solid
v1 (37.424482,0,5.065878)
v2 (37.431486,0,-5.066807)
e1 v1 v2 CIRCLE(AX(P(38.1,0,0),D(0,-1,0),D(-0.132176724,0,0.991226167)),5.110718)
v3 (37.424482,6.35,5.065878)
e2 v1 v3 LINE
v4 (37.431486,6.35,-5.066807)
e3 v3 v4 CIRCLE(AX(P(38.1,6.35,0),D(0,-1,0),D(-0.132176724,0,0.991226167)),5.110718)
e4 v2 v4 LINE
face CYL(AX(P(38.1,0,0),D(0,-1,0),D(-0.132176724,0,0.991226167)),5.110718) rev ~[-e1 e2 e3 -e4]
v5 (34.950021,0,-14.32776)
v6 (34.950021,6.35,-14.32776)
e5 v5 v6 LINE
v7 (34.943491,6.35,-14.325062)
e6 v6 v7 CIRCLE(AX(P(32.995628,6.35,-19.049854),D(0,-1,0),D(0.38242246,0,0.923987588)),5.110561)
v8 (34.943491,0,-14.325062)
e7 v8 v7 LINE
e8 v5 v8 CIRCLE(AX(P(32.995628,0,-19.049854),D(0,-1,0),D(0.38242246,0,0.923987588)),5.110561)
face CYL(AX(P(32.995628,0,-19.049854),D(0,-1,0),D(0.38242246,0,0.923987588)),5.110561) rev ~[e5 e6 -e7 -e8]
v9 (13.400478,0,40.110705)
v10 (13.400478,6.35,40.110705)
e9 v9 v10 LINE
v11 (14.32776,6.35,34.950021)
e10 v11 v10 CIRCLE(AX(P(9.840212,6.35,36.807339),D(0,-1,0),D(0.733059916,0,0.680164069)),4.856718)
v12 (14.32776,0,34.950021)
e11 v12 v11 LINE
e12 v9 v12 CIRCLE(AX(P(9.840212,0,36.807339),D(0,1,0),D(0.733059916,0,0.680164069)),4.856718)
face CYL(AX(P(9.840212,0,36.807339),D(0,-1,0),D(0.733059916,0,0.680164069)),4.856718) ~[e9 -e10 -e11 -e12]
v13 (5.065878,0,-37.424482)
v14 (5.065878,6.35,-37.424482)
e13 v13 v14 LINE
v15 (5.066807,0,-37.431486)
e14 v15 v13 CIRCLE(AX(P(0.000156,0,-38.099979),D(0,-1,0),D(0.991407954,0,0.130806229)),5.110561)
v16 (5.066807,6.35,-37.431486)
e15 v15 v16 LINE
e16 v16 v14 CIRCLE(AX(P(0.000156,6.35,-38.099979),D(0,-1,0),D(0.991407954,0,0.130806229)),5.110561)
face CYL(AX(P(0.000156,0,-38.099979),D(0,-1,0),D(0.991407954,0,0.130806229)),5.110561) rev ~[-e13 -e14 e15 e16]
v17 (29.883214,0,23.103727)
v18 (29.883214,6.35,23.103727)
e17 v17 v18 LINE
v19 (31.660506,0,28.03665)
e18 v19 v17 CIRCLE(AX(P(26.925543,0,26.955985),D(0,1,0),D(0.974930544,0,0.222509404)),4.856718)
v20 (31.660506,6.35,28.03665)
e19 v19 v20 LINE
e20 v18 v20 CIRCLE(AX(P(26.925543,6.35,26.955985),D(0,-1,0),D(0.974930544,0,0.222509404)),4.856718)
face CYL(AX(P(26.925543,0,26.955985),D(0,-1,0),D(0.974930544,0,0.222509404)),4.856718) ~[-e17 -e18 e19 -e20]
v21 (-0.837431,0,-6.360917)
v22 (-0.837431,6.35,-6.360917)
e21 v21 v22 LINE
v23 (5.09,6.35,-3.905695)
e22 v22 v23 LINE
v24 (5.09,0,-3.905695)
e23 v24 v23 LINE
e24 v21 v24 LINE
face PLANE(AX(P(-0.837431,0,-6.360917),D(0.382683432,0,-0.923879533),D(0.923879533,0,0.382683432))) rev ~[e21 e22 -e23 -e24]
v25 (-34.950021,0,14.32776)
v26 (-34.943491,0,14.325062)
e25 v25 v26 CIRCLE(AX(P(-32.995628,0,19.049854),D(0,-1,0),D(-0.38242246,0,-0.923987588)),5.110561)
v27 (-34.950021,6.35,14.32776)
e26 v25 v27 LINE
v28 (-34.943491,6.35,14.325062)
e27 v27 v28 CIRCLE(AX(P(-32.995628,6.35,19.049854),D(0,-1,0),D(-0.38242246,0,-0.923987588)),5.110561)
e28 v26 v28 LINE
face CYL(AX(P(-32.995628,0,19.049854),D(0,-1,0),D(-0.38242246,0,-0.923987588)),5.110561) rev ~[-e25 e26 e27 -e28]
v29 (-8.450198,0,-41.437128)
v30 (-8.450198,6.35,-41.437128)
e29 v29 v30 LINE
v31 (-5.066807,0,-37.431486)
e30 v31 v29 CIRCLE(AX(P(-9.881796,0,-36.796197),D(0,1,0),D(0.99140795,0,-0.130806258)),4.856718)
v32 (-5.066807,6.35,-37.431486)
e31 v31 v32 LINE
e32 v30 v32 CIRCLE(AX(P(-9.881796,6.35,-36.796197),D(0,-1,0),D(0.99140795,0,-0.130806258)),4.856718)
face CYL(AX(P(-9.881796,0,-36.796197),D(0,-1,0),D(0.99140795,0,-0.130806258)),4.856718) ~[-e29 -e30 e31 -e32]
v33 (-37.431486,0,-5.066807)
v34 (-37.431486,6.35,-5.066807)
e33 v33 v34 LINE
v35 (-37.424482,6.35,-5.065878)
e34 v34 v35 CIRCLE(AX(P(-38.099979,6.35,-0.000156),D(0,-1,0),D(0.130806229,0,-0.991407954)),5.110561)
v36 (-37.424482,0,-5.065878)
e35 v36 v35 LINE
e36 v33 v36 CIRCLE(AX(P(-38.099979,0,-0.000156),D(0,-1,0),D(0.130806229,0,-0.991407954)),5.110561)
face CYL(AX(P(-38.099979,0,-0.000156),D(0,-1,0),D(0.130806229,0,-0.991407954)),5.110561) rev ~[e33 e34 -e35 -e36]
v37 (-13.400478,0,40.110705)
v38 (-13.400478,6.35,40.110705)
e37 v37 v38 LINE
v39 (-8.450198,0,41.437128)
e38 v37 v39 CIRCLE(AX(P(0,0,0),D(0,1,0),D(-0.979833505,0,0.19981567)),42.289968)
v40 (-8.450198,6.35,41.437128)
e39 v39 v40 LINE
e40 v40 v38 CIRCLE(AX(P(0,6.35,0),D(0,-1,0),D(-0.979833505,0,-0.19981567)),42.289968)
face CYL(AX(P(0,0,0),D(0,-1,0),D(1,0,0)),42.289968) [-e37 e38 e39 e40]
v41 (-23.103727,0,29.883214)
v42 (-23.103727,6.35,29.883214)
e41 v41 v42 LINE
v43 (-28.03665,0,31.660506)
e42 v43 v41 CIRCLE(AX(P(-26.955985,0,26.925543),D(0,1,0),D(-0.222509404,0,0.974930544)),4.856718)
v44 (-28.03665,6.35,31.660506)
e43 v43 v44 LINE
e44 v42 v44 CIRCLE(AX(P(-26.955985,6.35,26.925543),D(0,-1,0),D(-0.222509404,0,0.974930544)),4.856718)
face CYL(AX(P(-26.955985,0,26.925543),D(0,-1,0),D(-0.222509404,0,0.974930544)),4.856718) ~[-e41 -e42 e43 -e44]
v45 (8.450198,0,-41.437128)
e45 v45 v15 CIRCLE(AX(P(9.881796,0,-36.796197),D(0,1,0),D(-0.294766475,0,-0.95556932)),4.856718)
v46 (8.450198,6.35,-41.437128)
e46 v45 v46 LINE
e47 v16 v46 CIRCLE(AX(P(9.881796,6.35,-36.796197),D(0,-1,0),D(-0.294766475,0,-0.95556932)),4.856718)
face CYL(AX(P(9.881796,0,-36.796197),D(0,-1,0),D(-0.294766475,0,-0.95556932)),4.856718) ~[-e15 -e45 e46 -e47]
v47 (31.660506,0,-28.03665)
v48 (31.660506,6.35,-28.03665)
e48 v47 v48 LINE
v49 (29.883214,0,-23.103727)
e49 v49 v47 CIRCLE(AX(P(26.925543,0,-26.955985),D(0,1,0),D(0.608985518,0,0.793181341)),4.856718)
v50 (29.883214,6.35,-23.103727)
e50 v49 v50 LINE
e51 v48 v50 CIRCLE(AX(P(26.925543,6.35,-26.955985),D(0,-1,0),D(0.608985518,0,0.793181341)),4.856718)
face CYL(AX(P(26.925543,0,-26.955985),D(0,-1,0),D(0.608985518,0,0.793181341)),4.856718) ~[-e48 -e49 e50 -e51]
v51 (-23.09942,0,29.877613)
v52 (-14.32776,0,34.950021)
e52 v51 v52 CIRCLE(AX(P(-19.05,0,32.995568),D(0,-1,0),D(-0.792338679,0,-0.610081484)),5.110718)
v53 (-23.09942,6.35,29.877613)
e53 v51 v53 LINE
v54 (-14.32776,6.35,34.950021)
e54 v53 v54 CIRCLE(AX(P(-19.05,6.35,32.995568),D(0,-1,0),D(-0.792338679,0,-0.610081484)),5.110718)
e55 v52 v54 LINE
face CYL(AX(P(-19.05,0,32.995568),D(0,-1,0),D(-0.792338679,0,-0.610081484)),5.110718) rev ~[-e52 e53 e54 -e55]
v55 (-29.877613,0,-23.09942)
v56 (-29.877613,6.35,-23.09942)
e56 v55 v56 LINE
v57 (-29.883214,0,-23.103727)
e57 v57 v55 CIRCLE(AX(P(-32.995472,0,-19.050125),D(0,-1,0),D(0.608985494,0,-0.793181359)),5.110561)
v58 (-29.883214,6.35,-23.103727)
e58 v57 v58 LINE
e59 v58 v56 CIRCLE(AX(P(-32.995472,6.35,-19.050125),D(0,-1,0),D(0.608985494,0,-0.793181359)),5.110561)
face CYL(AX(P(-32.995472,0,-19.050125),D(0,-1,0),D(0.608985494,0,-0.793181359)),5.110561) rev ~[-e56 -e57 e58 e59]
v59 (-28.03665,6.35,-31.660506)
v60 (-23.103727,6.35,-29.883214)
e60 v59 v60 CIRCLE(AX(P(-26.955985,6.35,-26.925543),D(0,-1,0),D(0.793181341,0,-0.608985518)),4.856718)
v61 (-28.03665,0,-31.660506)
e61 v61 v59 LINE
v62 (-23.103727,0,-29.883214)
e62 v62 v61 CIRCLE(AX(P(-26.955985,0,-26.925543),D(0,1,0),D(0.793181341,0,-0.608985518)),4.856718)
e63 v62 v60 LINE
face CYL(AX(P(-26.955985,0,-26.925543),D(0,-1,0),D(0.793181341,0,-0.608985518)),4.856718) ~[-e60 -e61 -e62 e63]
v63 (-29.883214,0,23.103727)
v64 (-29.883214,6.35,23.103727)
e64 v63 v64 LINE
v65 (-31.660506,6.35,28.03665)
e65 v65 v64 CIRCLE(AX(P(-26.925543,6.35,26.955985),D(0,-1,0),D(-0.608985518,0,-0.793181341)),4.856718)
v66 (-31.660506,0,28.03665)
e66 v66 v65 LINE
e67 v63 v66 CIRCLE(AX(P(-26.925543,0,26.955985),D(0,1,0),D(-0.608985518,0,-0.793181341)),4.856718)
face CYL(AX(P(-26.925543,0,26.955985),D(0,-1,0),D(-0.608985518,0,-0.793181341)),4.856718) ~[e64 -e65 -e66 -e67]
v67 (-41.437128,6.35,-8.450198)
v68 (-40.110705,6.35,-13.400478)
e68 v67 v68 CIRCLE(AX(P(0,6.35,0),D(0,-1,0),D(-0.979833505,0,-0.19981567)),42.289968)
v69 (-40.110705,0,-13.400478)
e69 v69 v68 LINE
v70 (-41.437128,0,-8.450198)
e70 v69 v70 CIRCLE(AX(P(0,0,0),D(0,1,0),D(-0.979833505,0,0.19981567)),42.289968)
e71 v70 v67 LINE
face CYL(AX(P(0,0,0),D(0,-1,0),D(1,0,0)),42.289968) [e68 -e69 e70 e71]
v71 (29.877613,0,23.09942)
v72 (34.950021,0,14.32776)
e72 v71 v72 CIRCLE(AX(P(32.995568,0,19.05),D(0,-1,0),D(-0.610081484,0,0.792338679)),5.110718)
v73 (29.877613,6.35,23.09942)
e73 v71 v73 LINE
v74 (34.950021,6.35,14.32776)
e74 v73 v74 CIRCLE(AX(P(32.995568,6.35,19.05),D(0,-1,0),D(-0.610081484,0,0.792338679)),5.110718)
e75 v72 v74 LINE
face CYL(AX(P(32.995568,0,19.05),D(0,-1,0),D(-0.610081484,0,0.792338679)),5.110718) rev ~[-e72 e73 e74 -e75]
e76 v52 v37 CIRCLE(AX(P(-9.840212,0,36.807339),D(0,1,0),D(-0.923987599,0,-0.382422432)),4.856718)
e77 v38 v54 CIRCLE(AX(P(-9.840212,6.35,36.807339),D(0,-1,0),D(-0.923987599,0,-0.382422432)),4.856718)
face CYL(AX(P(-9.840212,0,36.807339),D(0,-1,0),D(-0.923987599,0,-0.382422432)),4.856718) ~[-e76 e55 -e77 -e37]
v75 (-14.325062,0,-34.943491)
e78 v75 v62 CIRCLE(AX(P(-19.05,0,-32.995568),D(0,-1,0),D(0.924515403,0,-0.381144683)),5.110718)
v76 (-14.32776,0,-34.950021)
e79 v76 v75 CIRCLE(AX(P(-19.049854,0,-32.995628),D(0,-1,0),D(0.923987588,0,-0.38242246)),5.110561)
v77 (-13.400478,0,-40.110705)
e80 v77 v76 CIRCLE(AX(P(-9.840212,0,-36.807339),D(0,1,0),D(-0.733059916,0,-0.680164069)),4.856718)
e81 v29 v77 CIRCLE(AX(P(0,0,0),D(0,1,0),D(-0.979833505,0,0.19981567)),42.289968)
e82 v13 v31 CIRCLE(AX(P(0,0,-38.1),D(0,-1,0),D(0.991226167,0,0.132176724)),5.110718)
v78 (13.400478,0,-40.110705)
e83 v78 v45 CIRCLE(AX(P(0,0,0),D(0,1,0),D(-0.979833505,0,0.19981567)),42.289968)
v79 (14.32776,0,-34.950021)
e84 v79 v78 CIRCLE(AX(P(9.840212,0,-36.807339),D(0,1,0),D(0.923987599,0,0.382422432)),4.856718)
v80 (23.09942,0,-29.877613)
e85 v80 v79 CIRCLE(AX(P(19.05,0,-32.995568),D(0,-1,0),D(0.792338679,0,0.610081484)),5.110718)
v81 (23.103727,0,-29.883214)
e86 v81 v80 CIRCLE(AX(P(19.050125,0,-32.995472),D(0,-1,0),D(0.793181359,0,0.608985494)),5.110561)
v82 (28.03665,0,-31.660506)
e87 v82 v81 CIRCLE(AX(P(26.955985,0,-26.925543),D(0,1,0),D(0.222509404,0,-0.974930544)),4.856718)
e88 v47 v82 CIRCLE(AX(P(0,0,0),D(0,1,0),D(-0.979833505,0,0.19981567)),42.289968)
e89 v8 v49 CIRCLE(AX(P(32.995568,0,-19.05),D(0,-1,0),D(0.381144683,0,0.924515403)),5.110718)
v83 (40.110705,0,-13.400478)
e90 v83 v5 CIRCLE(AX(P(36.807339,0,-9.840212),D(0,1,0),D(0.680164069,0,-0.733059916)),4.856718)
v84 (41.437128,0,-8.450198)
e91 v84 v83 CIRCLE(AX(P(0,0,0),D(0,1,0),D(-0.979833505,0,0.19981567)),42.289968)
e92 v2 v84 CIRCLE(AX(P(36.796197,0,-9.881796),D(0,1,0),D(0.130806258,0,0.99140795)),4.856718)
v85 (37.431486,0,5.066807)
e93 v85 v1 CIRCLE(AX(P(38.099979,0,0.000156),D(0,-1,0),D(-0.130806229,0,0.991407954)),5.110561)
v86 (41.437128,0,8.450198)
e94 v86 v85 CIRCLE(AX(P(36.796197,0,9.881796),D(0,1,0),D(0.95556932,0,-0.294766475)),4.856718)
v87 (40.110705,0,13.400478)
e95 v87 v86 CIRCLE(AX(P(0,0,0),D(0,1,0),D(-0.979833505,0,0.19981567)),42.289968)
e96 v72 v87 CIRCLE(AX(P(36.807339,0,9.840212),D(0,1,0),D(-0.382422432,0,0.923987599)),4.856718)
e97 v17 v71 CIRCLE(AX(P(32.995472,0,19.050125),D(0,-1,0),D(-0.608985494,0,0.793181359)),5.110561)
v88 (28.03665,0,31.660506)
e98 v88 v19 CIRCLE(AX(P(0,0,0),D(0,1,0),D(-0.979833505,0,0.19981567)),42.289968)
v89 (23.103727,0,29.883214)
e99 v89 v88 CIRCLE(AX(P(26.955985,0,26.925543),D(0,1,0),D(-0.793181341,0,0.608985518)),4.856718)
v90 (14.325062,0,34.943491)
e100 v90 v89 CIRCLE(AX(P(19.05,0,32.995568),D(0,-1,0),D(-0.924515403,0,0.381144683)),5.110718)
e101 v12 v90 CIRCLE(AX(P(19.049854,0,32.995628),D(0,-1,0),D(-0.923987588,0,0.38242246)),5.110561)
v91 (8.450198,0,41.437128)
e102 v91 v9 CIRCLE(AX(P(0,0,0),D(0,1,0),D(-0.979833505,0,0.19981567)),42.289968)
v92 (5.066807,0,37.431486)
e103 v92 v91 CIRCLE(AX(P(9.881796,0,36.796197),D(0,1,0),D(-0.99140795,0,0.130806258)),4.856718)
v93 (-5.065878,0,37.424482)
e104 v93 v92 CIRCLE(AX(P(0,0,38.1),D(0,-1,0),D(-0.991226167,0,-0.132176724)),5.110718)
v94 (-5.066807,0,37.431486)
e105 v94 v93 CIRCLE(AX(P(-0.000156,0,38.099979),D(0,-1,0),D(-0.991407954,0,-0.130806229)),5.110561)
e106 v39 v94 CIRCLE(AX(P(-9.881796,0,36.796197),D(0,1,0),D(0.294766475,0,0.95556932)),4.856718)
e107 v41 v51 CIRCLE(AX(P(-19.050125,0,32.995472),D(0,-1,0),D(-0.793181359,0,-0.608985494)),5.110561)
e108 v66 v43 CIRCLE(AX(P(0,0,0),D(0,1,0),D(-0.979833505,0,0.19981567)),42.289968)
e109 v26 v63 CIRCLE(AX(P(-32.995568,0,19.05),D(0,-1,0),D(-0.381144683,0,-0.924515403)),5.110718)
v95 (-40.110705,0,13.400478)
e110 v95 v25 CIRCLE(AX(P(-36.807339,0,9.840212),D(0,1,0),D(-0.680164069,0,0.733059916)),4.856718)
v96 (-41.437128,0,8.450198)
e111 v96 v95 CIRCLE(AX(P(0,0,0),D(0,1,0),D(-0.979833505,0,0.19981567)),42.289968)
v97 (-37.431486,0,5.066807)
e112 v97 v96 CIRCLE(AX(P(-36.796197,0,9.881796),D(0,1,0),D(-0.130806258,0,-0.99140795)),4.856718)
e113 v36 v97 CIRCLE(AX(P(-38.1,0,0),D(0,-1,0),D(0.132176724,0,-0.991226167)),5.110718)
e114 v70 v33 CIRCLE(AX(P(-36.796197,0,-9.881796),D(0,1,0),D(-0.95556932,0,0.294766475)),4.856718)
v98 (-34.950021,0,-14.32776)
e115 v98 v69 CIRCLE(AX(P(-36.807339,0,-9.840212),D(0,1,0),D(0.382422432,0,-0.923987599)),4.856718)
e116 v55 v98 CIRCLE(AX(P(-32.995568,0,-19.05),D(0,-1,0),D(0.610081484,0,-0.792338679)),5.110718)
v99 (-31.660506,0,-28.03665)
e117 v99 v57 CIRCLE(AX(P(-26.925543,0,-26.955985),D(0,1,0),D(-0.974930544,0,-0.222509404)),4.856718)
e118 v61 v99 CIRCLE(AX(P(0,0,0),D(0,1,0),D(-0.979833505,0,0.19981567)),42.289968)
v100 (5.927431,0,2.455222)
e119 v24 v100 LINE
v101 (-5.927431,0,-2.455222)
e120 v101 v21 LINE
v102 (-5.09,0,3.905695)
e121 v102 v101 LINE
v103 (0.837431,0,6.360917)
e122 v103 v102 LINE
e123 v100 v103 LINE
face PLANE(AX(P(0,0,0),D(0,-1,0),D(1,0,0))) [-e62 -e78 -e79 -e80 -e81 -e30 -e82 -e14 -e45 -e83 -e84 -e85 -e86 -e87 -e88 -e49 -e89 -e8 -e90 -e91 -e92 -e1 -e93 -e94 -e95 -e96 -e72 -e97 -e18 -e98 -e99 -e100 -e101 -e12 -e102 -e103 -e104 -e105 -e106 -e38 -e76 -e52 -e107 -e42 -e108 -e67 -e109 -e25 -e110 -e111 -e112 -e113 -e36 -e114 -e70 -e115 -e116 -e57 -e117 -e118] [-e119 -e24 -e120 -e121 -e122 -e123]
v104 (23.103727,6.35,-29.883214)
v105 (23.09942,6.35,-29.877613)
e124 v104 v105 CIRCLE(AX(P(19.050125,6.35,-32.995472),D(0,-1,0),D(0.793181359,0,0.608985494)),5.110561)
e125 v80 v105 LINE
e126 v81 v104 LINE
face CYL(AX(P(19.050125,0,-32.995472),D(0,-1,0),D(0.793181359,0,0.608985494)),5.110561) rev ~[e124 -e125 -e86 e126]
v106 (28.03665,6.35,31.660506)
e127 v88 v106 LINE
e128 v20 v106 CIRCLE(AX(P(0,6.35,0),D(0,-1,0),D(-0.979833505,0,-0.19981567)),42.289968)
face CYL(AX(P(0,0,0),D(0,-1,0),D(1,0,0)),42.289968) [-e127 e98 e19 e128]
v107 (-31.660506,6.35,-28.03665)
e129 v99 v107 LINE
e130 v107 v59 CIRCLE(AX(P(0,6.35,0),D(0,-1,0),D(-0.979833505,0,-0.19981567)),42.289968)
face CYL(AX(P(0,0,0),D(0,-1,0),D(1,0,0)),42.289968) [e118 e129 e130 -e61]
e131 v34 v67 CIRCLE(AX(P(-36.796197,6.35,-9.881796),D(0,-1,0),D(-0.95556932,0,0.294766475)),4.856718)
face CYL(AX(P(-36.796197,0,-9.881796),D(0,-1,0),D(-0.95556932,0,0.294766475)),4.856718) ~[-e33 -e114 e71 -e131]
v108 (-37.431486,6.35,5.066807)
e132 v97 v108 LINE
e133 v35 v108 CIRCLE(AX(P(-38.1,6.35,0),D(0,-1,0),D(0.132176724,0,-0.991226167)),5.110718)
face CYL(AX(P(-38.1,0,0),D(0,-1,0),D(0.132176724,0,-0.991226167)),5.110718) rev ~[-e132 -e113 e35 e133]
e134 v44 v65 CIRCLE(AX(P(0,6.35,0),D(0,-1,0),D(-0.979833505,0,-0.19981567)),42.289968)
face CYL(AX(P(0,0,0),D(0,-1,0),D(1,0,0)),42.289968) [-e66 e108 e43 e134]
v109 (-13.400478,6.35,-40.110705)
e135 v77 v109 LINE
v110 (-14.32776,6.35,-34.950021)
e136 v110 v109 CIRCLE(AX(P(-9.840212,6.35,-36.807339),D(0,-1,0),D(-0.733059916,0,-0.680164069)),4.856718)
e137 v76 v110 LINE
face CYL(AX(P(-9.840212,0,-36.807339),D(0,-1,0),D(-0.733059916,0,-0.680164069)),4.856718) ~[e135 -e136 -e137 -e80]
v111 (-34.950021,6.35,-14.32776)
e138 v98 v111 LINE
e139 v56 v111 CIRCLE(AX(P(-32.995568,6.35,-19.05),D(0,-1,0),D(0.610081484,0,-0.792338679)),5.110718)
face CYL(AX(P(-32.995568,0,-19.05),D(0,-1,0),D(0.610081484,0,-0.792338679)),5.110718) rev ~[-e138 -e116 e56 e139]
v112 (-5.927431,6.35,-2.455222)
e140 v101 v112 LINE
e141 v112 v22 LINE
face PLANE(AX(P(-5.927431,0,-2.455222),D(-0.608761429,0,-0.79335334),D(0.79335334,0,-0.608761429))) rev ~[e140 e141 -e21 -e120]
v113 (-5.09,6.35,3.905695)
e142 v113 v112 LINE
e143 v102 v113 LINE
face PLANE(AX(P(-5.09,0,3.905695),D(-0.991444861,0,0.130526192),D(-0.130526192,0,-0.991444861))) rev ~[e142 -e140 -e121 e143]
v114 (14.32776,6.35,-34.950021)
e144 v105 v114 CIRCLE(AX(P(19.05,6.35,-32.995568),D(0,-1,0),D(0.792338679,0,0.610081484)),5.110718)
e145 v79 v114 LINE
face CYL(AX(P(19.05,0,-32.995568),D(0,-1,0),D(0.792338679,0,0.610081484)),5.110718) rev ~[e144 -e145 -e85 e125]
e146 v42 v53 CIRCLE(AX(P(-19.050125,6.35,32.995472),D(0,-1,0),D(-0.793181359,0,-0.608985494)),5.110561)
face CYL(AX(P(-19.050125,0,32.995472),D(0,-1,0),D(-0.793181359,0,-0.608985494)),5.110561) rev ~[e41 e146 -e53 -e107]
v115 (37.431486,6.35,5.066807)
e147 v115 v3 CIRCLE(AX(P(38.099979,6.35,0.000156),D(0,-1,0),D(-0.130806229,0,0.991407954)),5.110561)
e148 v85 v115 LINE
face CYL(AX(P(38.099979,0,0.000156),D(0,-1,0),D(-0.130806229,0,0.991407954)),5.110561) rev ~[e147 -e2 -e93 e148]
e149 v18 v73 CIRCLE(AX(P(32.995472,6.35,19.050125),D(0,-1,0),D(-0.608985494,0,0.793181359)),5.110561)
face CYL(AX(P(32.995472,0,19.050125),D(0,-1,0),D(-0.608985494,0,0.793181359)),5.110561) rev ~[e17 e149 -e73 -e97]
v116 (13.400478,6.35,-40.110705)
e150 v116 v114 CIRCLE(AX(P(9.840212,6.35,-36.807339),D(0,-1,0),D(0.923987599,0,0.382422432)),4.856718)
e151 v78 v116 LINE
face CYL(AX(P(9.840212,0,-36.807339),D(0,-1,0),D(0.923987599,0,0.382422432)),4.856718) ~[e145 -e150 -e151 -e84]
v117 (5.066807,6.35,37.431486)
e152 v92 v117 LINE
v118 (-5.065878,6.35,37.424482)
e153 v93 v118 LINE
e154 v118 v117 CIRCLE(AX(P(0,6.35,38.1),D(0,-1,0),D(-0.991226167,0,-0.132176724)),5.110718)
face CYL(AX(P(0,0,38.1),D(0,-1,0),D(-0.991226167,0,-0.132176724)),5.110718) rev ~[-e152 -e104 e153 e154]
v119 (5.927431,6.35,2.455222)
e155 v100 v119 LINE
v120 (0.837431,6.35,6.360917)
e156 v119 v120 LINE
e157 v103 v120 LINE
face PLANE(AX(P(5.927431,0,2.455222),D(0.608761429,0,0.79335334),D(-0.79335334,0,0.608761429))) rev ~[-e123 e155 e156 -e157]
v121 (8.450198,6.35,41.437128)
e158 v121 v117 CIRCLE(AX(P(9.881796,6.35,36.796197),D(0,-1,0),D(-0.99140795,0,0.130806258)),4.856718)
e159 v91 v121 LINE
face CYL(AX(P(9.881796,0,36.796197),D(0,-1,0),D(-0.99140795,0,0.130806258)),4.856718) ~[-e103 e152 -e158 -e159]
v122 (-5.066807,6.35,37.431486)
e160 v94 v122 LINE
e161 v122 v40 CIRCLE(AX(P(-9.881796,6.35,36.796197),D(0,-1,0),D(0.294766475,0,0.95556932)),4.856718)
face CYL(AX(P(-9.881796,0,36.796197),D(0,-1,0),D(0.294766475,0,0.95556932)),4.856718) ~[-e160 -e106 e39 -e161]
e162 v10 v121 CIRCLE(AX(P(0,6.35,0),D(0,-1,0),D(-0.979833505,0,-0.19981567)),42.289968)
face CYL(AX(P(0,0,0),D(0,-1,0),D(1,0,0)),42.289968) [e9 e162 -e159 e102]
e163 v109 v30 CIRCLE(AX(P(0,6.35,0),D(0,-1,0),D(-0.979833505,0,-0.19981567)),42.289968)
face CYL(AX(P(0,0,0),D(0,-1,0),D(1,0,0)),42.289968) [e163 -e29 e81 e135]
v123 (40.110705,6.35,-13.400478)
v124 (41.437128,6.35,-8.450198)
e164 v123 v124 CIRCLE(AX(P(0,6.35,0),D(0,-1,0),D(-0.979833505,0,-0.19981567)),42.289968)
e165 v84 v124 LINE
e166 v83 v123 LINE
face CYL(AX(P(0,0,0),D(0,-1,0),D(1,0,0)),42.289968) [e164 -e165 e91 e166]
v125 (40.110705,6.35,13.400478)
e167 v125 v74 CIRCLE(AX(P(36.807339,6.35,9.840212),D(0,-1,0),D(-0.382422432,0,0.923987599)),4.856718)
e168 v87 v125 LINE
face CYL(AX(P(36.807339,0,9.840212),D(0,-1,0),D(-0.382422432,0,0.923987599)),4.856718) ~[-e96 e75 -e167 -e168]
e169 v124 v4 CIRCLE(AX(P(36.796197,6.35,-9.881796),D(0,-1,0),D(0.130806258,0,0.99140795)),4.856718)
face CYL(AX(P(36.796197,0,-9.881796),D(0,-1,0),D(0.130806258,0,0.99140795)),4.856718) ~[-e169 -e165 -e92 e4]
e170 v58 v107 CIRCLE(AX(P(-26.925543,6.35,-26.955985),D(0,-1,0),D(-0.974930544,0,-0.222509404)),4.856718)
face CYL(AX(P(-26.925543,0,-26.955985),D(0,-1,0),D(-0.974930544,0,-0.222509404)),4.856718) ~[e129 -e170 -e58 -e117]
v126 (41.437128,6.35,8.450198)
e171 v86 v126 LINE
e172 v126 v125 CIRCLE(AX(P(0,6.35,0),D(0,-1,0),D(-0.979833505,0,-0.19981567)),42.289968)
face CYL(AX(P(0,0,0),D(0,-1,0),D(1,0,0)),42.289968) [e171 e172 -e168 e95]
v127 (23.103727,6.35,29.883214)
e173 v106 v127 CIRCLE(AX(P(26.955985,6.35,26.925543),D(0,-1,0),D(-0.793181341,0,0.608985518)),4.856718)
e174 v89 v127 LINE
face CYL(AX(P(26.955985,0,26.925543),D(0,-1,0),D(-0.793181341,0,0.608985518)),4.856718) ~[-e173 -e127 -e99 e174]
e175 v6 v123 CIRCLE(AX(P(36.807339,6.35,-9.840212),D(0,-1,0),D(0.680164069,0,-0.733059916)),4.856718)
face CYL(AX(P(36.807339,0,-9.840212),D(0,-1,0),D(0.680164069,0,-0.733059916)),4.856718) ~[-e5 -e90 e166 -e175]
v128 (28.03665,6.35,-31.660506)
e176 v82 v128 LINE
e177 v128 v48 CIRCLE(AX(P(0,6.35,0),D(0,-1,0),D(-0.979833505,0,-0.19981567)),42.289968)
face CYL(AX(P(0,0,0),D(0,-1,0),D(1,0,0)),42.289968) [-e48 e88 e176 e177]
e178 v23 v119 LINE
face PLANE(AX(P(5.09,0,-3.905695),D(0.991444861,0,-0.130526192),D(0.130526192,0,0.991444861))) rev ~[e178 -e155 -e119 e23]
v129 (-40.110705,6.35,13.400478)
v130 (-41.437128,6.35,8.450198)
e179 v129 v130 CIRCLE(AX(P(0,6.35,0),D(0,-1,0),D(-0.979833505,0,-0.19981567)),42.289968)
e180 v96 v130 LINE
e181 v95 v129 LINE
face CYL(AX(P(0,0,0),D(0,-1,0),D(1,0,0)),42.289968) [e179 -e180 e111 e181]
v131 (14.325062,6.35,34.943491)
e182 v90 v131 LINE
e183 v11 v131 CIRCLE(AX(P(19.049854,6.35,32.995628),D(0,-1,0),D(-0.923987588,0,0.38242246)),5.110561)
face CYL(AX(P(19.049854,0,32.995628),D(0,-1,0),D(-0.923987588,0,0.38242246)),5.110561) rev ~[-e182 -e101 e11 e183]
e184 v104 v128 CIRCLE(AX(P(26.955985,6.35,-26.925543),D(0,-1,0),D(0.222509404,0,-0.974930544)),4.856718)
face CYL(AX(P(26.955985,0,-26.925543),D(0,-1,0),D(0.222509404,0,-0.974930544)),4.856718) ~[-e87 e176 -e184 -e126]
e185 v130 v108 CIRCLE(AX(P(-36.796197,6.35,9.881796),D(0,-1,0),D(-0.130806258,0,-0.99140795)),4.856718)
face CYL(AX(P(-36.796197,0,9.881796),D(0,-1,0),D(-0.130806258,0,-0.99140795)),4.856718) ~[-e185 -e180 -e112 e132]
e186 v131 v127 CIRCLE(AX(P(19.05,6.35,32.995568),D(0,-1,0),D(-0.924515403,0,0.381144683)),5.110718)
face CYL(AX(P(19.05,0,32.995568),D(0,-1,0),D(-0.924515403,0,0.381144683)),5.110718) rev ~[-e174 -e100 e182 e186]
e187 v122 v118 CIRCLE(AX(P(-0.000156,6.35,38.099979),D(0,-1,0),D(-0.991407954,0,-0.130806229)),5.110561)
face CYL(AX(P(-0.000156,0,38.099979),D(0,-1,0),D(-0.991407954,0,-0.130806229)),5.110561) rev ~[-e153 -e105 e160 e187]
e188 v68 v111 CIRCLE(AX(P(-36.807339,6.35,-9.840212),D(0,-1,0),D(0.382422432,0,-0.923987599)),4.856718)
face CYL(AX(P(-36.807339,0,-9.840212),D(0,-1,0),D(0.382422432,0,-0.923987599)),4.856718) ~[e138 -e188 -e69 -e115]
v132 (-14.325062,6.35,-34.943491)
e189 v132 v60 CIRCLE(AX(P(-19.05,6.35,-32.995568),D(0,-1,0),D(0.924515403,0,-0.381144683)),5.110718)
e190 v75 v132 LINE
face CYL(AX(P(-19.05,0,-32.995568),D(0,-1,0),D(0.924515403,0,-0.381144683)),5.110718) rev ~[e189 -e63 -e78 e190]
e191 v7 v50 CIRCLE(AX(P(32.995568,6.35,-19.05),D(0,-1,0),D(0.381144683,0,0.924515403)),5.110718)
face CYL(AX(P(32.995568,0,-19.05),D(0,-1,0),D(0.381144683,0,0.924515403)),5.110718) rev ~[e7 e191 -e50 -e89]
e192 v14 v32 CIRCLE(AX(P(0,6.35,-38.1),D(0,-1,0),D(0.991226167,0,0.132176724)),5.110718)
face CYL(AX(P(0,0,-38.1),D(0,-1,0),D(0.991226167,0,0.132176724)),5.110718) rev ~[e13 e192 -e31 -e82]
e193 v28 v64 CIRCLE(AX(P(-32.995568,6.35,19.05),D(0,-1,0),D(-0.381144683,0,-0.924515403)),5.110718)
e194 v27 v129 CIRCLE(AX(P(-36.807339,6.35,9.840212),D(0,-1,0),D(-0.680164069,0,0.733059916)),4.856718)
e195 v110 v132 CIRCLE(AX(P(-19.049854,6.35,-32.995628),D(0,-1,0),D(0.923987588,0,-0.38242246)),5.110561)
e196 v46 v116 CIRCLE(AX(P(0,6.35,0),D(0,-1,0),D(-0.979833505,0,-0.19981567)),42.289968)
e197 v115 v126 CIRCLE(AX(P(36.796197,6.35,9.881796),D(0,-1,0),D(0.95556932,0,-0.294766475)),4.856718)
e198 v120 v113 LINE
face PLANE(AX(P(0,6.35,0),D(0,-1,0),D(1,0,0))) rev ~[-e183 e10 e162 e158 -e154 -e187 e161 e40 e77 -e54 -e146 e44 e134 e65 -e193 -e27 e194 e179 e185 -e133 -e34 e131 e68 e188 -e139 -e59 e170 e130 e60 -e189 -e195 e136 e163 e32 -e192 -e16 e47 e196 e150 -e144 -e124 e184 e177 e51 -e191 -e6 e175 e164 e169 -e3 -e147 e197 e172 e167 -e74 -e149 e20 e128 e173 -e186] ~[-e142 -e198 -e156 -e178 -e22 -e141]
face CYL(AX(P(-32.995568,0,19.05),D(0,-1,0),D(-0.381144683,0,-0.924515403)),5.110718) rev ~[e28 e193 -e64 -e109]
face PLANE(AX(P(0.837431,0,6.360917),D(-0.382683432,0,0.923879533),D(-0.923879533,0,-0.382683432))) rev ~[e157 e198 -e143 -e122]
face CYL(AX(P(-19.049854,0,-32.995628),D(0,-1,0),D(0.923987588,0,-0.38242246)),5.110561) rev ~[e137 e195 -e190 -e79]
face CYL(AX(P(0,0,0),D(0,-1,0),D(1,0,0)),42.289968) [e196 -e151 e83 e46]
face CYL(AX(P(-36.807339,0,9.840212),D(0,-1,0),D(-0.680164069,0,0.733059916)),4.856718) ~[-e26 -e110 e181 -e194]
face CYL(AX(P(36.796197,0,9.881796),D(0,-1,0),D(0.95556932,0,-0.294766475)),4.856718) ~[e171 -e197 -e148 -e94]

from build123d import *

# Parameters (mm, degrees)
F0_R            = 42.2899684473
F1_DEPTH        = 6.35
F3_DEPTH        = 6.351
F3_COPIES_COUNT = 12
F5_DEPTH        = 6.351


# Not quite as in the source:
# - a pattern or mirror of a feature is missing from the dataset's text; its kind, count and spacing are read off the source's solid


with BuildPart() as f1:
    # F0 (on Front) → F1 (new body)
    with BuildSketch(Plane.XZ):
        Circle(F0_R)
    extrude(amount=-F1_DEPTH)

    # F2 (on face) → F3 (cut, through all)
    with BuildSketch(Plane.XZ):
        with BuildLine():
            ThreePointArc((-41.4371280171, -8.4501983983), (-39.9301176937, -6.1715058408), (-37.4314860419, -5.0668068974))
            ThreePointArc((-37.4314860419, -5.0668068974), (-37.42798385, -5.0663435871), (-37.4244819792, -5.065877856))
            ThreePointArc((-37.4244819792, -5.065877856), (-32.9892827736, 0.0035327048), (-37.4314860419, 5.0668068974))
            ThreePointArc((-37.4314860419, 5.0668068974), (-39.9301176937, 6.1715058408), (-41.4371280171, 8.4501983983))
            ThreePointArc((-41.4371280171, 8.4501983983), (-42.2899684473, 0), (-41.4371280171, -8.4501983983))
        make_face()
    f3 = extrude(amount=-F3_DEPTH, mode=Mode.SUBTRACT)

    # F3_copies: F3 ×12 about axis
    f3_copies_axis = Axis((0, 0, 0), (0, 1, 0))
    for i in range(1, F3_COPIES_COUNT):
        add(f3.rotate(f3_copies_axis, i * 360 / F3_COPIES_COUNT), mode=Mode.SUBTRACT)

    # F4 (on face) → F5 (cut, through all)
    with BuildSketch(Plane.XZ):
        Polygon((0.8374305792, 6.3609167663), (-5.0900002214, 3.9056945387), (-5.9274308006, -2.4552222276), (-0.8374305792, -6.3609167663), (5.0900002214, -3.9056945387), (5.9274308006, 2.4552222276), align=None)
    extrude(amount=-F5_DEPTH, mode=Mode.SUBTRACT)


solid = f1.part
